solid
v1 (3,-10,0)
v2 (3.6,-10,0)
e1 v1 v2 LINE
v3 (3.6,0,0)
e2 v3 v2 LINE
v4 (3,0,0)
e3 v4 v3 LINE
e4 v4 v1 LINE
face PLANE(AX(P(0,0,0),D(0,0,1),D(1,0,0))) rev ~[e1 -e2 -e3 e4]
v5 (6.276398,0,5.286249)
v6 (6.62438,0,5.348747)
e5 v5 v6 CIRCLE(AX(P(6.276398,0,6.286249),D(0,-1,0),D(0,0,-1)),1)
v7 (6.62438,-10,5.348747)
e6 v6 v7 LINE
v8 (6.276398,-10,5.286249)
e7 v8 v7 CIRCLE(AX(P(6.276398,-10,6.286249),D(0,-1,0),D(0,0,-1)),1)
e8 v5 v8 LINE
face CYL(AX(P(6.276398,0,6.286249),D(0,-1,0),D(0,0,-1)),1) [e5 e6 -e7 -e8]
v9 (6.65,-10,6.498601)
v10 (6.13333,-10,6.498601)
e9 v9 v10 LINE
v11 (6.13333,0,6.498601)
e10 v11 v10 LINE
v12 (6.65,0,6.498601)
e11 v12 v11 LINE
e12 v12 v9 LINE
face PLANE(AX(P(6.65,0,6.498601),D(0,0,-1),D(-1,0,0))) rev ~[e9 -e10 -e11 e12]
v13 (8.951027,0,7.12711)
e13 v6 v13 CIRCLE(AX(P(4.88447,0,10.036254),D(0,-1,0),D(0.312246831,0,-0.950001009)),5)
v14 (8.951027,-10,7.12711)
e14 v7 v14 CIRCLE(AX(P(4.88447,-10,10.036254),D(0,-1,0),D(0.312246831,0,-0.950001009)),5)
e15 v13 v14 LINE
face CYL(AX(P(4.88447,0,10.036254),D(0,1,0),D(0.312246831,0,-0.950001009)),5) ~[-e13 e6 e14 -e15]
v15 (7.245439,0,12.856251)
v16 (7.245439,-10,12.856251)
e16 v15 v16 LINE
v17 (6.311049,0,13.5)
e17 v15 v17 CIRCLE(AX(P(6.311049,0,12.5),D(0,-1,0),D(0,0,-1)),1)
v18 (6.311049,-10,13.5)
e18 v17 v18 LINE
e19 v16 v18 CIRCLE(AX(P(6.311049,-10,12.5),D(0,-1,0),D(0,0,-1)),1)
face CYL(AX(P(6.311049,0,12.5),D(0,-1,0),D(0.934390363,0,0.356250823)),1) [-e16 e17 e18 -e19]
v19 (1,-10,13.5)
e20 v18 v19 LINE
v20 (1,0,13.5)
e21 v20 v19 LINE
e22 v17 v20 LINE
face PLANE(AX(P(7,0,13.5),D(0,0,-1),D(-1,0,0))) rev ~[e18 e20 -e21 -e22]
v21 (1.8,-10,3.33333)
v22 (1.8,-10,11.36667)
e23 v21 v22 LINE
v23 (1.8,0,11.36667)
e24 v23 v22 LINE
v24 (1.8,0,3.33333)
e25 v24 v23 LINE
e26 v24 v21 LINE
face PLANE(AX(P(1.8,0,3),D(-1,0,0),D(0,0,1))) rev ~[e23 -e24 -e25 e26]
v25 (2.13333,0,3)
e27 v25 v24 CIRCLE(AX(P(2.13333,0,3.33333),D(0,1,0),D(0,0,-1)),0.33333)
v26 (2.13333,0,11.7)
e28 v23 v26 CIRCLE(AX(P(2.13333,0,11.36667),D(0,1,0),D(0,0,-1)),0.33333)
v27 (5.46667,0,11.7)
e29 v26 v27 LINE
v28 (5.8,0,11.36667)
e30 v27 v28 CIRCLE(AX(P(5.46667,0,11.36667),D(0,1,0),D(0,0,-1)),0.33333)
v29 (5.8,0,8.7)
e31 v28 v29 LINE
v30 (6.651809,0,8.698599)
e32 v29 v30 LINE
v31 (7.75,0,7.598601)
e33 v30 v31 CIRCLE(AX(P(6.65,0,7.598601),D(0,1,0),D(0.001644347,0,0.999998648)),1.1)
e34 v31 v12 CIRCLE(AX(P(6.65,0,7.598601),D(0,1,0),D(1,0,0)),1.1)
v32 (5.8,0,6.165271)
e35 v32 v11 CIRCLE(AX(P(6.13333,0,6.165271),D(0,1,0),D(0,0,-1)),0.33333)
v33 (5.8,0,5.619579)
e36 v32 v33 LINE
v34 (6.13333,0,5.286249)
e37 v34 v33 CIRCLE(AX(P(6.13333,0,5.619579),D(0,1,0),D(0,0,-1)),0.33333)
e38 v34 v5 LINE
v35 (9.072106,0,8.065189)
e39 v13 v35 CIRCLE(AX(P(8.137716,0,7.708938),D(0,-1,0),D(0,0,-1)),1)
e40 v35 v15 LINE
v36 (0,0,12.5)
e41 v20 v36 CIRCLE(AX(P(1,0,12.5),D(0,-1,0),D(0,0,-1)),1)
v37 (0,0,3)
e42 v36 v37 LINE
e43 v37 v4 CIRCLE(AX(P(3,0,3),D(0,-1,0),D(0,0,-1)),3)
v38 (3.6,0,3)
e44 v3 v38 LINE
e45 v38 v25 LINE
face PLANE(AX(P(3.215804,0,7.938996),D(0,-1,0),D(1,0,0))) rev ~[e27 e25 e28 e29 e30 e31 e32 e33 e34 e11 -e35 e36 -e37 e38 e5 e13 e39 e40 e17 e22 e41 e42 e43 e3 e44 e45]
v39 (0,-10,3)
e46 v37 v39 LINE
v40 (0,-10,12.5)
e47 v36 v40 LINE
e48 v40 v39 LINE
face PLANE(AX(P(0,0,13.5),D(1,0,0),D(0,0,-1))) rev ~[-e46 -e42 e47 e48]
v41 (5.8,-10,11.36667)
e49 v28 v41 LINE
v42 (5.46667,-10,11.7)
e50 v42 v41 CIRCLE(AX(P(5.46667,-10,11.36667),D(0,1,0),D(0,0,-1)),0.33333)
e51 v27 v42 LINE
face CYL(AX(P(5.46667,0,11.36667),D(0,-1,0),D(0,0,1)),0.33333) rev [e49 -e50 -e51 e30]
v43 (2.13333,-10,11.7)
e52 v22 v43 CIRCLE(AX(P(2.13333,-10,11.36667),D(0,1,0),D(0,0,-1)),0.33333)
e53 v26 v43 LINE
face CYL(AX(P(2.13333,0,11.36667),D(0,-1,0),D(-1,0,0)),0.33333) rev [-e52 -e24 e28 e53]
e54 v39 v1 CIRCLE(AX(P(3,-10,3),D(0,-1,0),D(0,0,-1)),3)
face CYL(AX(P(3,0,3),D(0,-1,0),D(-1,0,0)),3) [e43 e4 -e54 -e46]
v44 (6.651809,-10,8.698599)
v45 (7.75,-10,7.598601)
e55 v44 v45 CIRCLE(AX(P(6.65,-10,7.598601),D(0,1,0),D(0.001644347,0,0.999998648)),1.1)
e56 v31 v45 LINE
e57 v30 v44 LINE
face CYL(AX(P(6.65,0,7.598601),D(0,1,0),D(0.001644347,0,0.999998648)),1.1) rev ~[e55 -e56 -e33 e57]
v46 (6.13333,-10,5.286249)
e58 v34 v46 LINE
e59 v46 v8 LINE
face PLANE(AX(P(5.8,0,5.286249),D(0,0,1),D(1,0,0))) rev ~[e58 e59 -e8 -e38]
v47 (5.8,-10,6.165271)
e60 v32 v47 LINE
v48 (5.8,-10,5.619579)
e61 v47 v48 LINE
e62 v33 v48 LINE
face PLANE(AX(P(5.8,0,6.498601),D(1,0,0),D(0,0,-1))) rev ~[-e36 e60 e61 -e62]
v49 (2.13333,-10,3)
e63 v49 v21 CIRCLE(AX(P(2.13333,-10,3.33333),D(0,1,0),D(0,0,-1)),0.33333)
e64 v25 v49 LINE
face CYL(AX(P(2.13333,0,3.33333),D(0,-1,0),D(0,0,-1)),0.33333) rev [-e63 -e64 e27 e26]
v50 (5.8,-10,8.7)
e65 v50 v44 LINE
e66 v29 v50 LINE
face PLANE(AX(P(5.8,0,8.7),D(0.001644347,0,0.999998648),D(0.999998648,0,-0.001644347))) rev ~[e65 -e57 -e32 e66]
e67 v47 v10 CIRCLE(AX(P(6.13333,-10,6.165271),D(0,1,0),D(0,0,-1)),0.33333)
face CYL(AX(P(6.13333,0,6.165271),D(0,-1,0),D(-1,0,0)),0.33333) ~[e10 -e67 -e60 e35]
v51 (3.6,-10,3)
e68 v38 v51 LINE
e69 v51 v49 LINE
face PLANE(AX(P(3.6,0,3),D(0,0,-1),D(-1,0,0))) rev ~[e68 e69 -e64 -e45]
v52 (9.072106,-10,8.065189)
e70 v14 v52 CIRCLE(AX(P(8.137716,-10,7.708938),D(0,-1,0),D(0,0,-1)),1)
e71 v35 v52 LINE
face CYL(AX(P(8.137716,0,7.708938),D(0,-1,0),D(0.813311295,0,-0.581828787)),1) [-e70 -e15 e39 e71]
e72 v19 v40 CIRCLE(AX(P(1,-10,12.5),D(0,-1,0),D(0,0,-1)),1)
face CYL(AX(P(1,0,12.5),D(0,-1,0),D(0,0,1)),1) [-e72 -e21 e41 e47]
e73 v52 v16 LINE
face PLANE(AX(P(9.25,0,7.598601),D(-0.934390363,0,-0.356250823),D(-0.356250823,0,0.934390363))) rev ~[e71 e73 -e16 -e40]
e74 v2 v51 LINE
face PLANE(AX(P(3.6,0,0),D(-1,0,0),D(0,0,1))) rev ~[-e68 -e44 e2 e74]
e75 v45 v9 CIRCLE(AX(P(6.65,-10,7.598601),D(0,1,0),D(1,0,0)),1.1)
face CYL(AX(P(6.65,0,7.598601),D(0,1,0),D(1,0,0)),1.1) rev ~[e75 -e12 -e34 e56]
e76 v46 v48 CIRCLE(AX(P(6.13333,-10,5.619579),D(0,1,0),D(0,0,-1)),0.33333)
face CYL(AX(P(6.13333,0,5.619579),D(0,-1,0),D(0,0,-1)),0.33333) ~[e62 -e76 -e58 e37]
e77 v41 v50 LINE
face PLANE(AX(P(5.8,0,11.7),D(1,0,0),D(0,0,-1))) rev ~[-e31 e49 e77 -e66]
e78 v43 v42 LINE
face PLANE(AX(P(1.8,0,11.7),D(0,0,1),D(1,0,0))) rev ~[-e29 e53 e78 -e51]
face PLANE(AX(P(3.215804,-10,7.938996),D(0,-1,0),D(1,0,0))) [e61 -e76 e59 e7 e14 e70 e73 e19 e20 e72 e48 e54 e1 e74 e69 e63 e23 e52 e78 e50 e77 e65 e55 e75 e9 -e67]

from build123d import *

# Parameters (mm, degrees)
F1_DEPTH = 10
F2_R     = 1
F3_R     = 3
F4_R     = 0.33333


with BuildPart() as f1:
    # F0 (on Front) → F1 (new body)
    with BuildSketch(Plane.XZ):
        with BuildLine():
            Line((0, 0), (3.6, 0))
            Line((3.6, 0), (3.6, 3))
            Line((3.6, 3), (1.8, 3))
            Line((1.8, 3), (1.8, 11.7))
            Line((1.8, 11.7), (5.8, 11.7))
            Line((5.8, 11.7), (5.8, 8.7))
            Line((5.8, 8.7), (6.6518087818, 8.6985993288))
            ThreePointArc((6.6518087818, 8.6985993288), (7.4284566976, 8.3757785113), (7.75, 7.598600816))
            Line((7.75, 7.598600816), (9.25, 7.598600816))
            Line((9.25, 7.598600816), (7, 13.5))
            Line((7, 13.5), (0, 13.5))
            Line((0, 13.5), (0, 0))
        make_face()
        with BuildLine():
            ThreePointArc((6.4457045279, 5.2862485499), (8.0654097754, 6.1785827272), (9.25, 7.598600816))
            Line((9.25, 7.598600816), (7.75, 7.598600816))
            ThreePointArc((7.75, 7.598600816), (7.4278174593, 6.8207833567), (6.65, 6.498600816))
            Line((6.65, 6.498600816), (5.8, 6.498600816))
            Line((5.8, 6.498600816), (5.8, 5.2862485499))
            Line((5.8, 5.2862485499), (6.4457045279, 5.2862485499))
        make_face()
    extrude(amount=F1_DEPTH)

    # F2
    f2_edges = [f1.edges().sort_by_distance(p)[0] for p in [
        (0, -5, 13.5),
        (7, -5, 13.5),
        (6.445705, -5, 5.286249),
        (9.25, -5, 7.598601),
    ]]
    fillet(f2_edges, radius=F2_R)

    # F3
    f3_edges = [f1.edges().sort_by_distance(p)[0] for p in [
        (0, -5, 0),
    ]]
    fillet(f3_edges, radius=F3_R)

    # F4
    f4_edges = [f1.edges().sort_by_distance(p)[0] for p in [
        (5.8, -5, 11.7),
        (5.8, -5, 5.286249),
        (5.8, -5, 6.498601),
        (1.8, -5, 3),
        (1.8, -5, 11.7),
    ]]
    fillet(f4_edges, radius=F4_R)


solid = f1.part
